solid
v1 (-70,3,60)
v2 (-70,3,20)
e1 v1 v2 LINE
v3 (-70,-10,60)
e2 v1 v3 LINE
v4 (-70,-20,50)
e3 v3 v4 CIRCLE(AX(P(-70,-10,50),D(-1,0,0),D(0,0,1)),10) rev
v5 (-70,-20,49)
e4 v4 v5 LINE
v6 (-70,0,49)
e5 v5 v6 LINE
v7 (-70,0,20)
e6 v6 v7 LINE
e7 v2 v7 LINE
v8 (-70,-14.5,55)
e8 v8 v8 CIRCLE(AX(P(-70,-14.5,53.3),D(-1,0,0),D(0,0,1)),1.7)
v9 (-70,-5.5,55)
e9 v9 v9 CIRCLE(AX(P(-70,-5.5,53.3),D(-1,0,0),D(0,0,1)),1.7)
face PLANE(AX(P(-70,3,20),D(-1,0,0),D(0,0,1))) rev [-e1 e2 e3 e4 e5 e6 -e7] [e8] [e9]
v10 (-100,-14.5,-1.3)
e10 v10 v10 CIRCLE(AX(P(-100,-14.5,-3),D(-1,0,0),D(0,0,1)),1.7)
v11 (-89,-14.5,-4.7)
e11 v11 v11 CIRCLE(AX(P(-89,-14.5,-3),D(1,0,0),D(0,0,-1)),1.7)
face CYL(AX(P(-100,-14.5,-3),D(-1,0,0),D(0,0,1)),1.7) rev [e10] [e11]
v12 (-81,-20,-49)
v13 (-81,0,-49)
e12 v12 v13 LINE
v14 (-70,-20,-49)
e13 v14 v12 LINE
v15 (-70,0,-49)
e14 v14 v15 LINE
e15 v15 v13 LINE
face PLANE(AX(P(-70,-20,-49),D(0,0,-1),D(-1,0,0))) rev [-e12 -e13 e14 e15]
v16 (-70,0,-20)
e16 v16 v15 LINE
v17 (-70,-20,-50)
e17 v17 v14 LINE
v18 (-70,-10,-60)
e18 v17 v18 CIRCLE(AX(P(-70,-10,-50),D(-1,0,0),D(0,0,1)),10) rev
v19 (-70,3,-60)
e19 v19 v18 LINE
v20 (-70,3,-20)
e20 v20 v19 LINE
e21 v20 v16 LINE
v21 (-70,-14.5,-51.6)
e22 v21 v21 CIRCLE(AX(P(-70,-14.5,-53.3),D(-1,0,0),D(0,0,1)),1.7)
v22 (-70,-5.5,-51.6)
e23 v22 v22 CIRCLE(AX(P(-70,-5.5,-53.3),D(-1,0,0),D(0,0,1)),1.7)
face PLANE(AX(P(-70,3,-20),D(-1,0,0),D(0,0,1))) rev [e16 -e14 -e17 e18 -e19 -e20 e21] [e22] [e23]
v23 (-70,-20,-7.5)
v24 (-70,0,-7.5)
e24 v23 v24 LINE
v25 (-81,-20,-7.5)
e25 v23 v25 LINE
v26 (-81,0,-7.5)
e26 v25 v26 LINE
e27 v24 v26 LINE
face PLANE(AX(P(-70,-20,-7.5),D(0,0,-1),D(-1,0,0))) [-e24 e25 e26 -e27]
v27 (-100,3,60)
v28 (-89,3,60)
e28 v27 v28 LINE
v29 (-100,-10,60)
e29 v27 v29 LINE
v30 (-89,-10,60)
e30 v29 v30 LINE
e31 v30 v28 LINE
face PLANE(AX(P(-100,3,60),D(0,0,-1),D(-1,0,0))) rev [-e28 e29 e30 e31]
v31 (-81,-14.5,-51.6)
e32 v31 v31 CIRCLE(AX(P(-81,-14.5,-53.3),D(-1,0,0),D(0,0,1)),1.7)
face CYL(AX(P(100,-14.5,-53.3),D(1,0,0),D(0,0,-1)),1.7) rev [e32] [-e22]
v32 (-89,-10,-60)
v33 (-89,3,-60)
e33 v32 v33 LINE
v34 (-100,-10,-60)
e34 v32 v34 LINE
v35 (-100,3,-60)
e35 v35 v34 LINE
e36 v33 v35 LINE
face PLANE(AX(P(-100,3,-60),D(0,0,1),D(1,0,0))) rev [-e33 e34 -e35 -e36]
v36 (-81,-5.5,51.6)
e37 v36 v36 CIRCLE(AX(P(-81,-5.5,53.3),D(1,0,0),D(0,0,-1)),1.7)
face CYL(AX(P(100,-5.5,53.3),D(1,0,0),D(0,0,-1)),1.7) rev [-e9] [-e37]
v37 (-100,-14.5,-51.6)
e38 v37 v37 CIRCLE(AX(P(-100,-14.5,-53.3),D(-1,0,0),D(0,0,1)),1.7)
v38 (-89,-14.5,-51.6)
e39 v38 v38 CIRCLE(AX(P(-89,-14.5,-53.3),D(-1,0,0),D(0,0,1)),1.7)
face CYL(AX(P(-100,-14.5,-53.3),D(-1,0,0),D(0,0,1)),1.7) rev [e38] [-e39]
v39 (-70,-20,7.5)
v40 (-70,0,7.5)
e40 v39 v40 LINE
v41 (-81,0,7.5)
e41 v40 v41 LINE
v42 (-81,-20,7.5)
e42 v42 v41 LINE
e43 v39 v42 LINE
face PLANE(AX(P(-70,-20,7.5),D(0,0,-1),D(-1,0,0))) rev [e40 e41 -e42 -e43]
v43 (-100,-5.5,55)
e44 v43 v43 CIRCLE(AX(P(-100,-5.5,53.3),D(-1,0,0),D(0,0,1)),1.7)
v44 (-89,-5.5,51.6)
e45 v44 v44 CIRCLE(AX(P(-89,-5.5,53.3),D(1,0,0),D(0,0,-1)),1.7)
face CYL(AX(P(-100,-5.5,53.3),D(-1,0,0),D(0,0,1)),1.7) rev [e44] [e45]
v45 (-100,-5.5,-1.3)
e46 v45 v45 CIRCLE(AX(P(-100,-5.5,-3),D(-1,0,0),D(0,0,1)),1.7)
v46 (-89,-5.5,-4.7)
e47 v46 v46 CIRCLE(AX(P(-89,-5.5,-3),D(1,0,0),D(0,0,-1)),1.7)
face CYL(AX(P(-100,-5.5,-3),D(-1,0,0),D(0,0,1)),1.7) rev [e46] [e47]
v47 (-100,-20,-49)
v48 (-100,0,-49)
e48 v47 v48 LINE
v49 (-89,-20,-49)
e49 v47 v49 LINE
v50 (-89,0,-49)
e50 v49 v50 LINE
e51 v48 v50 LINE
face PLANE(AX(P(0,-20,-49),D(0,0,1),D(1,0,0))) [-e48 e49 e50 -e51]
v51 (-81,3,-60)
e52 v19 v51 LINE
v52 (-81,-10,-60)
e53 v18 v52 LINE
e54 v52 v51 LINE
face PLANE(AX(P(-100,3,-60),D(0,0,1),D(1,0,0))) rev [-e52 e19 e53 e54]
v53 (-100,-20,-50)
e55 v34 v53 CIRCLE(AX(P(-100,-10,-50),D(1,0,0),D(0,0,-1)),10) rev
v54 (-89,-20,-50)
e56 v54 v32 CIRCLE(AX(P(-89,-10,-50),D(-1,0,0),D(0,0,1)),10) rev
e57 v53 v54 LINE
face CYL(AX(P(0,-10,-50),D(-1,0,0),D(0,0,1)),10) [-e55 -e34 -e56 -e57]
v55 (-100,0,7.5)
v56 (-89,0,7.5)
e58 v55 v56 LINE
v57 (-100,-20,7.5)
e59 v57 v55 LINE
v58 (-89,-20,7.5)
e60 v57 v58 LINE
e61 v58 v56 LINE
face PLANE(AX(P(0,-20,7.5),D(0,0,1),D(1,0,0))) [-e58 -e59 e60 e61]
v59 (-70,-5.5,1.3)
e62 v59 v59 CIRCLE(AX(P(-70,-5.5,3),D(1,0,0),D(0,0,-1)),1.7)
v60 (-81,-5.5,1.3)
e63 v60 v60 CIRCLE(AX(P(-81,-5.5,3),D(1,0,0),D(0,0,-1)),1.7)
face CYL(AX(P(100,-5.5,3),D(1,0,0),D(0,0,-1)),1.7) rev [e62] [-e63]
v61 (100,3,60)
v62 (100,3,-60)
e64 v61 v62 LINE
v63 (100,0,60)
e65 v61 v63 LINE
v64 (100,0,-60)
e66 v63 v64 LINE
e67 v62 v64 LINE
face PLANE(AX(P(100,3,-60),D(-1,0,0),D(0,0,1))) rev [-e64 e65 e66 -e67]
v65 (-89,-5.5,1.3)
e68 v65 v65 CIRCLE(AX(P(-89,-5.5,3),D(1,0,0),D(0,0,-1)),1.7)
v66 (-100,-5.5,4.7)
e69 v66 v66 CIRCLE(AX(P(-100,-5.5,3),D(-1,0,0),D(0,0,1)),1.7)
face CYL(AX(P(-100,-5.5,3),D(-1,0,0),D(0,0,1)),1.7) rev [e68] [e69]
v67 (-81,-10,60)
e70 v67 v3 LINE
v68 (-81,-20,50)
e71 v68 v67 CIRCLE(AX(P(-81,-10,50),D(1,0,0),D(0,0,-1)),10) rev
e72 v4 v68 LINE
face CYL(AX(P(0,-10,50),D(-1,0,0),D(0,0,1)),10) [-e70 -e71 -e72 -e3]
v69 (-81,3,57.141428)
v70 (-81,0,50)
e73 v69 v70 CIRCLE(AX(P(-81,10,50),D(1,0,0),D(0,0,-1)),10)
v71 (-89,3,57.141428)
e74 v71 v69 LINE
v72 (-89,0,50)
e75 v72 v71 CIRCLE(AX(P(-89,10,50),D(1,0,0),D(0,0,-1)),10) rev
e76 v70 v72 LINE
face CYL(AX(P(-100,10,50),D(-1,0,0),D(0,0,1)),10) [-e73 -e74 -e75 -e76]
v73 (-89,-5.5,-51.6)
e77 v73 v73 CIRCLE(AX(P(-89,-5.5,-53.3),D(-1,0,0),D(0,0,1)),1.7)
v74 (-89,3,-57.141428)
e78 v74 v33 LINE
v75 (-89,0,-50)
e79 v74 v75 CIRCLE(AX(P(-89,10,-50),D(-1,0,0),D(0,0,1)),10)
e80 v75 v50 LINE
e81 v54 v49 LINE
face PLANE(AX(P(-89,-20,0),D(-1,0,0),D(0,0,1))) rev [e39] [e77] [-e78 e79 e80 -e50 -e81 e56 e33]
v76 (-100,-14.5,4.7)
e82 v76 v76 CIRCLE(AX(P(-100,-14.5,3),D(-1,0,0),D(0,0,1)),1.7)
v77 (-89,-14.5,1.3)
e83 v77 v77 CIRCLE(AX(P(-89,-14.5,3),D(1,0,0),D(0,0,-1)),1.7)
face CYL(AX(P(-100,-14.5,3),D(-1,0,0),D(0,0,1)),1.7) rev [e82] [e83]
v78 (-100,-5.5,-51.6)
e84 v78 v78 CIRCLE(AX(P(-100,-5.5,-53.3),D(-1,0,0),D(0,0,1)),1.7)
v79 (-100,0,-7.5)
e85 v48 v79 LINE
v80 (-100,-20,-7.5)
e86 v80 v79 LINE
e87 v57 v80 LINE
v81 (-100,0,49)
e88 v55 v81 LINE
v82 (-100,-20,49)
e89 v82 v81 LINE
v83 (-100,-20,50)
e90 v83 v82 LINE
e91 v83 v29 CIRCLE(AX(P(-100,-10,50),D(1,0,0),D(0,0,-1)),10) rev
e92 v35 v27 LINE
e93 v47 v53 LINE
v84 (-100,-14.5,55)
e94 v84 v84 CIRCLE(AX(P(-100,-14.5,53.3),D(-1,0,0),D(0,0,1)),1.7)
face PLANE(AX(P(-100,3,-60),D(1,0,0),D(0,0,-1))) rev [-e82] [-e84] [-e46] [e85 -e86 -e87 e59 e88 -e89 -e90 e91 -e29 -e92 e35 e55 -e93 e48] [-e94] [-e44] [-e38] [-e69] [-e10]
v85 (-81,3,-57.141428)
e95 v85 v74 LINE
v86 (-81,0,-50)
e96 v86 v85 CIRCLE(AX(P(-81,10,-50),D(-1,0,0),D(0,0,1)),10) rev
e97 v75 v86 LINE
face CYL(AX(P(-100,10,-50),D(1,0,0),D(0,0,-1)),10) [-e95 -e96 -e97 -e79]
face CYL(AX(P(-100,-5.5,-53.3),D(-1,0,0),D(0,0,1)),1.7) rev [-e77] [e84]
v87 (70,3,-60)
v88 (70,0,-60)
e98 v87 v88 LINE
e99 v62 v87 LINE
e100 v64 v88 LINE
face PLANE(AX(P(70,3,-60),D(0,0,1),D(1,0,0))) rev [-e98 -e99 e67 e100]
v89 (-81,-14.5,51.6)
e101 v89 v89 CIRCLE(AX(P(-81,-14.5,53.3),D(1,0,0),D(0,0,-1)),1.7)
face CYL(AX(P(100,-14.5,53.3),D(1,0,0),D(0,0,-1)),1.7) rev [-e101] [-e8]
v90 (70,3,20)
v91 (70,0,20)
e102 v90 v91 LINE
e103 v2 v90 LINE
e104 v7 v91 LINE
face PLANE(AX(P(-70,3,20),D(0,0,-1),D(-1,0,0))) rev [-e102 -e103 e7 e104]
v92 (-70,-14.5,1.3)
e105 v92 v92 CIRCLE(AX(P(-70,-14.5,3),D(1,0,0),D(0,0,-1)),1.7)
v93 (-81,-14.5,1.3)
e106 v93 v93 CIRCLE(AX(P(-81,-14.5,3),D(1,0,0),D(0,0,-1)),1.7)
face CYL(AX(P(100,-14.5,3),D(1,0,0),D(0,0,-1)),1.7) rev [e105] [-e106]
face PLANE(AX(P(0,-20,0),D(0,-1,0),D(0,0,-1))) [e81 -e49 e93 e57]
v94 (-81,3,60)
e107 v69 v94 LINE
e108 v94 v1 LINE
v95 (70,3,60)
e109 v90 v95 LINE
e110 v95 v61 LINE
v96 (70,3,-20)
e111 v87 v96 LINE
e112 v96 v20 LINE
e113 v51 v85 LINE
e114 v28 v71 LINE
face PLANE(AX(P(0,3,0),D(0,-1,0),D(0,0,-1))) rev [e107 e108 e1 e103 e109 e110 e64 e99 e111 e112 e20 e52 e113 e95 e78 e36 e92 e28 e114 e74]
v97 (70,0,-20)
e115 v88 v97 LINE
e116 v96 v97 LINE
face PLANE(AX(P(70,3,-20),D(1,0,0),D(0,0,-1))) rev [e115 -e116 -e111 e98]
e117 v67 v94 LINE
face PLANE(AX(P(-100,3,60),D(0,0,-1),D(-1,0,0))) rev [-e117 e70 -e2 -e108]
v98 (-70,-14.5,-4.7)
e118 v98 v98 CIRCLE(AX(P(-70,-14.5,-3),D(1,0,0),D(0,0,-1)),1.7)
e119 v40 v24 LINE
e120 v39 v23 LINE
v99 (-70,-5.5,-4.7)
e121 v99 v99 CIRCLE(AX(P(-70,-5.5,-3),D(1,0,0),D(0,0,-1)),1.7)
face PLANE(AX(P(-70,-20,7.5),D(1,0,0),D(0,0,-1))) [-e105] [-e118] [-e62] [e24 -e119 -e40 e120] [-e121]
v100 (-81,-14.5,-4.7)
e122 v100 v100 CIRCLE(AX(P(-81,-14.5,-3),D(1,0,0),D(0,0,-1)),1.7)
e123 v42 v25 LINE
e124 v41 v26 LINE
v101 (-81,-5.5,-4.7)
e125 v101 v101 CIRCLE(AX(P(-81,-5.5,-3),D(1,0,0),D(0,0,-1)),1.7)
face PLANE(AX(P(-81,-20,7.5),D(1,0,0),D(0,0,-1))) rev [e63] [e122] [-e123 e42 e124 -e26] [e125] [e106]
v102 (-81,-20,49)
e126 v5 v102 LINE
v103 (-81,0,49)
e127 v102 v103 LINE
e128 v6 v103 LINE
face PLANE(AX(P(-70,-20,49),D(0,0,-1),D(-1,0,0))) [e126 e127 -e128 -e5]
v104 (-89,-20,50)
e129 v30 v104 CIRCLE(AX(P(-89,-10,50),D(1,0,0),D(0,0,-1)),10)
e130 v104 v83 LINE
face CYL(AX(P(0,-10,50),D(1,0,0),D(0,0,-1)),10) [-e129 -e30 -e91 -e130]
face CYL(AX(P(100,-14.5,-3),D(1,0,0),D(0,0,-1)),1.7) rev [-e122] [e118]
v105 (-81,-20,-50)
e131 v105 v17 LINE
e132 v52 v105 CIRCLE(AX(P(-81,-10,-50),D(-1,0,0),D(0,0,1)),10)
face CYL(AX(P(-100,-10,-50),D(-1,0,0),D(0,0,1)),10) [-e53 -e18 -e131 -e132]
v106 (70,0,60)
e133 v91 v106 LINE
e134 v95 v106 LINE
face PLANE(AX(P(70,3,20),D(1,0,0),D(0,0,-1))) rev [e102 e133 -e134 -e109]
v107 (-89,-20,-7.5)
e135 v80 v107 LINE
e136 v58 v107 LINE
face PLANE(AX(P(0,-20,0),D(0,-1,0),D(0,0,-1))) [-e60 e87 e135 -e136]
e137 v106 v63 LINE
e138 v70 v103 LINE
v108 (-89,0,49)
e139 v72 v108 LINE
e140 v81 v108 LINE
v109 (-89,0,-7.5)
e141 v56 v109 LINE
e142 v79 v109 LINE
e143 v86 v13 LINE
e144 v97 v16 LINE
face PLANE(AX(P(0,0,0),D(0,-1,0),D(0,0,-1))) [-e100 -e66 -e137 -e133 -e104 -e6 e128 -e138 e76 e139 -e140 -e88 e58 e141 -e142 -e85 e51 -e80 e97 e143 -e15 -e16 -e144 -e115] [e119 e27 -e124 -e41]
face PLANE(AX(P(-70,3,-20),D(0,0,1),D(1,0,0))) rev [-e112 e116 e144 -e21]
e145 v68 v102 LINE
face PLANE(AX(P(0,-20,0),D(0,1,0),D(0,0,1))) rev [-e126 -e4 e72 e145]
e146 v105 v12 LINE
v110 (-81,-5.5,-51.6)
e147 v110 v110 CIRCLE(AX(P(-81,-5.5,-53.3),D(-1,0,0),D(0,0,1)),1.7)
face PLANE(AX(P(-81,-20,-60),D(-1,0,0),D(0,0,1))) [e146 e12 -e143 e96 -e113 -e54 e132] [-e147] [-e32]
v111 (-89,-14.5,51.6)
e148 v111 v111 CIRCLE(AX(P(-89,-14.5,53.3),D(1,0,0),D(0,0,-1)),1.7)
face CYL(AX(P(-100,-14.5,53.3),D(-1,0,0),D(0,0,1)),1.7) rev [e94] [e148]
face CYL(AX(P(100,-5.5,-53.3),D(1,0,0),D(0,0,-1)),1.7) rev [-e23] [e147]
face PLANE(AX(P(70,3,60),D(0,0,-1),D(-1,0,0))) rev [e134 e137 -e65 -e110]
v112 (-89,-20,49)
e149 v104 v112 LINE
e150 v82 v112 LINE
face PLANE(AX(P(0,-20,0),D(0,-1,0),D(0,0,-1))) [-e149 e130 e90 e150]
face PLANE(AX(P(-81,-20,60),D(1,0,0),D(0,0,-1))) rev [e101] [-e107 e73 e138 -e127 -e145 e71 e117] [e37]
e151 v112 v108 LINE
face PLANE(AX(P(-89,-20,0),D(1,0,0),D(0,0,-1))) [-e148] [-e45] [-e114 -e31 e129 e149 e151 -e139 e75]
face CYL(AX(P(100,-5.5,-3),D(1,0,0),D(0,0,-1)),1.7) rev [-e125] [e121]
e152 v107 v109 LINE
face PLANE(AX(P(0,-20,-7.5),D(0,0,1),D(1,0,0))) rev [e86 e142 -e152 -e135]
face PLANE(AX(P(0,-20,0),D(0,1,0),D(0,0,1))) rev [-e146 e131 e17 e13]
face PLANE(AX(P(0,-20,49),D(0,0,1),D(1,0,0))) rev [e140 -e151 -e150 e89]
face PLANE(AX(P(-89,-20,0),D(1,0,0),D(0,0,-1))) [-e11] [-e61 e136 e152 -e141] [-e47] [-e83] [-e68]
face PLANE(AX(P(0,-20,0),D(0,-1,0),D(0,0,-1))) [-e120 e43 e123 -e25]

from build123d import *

# Parameters (mm, degrees)
EXTRUDE_1_DEPTH         = 3
SKETCH_3_W              = 11
SKETCH_3_H              = 7.5
SKETCH_3_H_2            = 11
SKETCH_3_H_3            = 15
EXTRUDE_3_DEPTH         = 20
HOLE_WIZARD_M3_1_REACH  = 211.762
HOLE_WIZARD_M3_1_BORE_R = 1.7
FILLET_1_R              = 10


with BuildPart() as part:
    # 스케치1 → 보스-돌출1 (new body)
    with BuildSketch(Plane(origin=(0, 0, 0), x_dir=(1, 0, 0), z_dir=(0, 1, 0))):
        Polygon((-100, 60), (-70, 60), (-70, 20), (70, 20), (70, 60), (100, 60), (100, -60), (70, -60), (70, -20), (-70, -20), (-70, -60), (-100, -60), align=None)
    extrude(amount=EXTRUDE_1_DEPTH)

    # 스케치3 → 보스-돌출3 (add)
    with BuildSketch(Plane.XZ):
        with Locations((-94.5, -3.75)):
            Rectangle(SKETCH_3_W, SKETCH_3_H)
        with Locations((-94.5, 3.75)):
            Rectangle(SKETCH_3_W, SKETCH_3_H)
        with Locations((-94.5, 54.5)):
            Rectangle(SKETCH_3_W, SKETCH_3_H_2)
        with Locations((-94.5, -54.5)):
            Rectangle(SKETCH_3_W, SKETCH_3_H_2)
        with Locations((-75.5, 54.5)):
            Rectangle(SKETCH_3_W, SKETCH_3_H_2)
        with Locations((-75.5, -54.5)):
            Rectangle(SKETCH_3_W, SKETCH_3_H_2)
        with Locations((-75.5, 0)):
            Rectangle(SKETCH_3_W, SKETCH_3_H_3)
    extrude(amount=EXTRUDE_3_DEPTH)

    # M3 여유 구멍1 bore → M3 여유 구멍1 (cut, up to next)
    with BuildSketch(Plane.ZY.offset(100), mode=Mode.PRIVATE) as hole_wizard_m3_1_sk1:
        with Locations((-3, -5.5)):
            Circle(HOLE_WIZARD_M3_1_BORE_R)
    hole_wizard_m3_1_tool1 = extrude(hole_wizard_m3_1_sk1.sketch, amount=-HOLE_WIZARD_M3_1_REACH, mode=Mode.PRIVATE) & part.part
    # M3 여유 구멍1 bore → M3 여유 구멍1 (cut, up to next)
    with BuildSketch(Plane.ZY.offset(100), mode=Mode.PRIVATE) as hole_wizard_m3_1_sk2:
        with Locations((-3, -14.5)):
            Circle(HOLE_WIZARD_M3_1_BORE_R)
    hole_wizard_m3_1_tool2 = extrude(hole_wizard_m3_1_sk2.sketch, amount=-HOLE_WIZARD_M3_1_REACH, mode=Mode.PRIVATE) & part.part
    # M3 여유 구멍1 bore → M3 여유 구멍1 (cut, up to next)
    with BuildSketch(Plane.ZY.offset(100), mode=Mode.PRIVATE) as hole_wizard_m3_1_sk3:
        with Locations((-53.3, -5.5)):
            Circle(HOLE_WIZARD_M3_1_BORE_R)
    hole_wizard_m3_1_tool3 = extrude(hole_wizard_m3_1_sk3.sketch, amount=-HOLE_WIZARD_M3_1_REACH, mode=Mode.PRIVATE) & part.part
    # M3 여유 구멍1 bore → M3 여유 구멍1 (cut, up to next)
    with BuildSketch(Plane.ZY.offset(100), mode=Mode.PRIVATE) as hole_wizard_m3_1_sk4:
        with Locations((-53.3, -14.5)):
            Circle(HOLE_WIZARD_M3_1_BORE_R)
    hole_wizard_m3_1_tool4 = extrude(hole_wizard_m3_1_sk4.sketch, amount=-HOLE_WIZARD_M3_1_REACH, mode=Mode.PRIVATE) & part.part
    # M3 여유 구멍1 bore → M3 여유 구멍1 (cut, up to next)
    with BuildSketch(Plane.ZY.offset(100), mode=Mode.PRIVATE) as hole_wizard_m3_1_sk5:
        with Locations((53.3, -5.5)):
            Circle(HOLE_WIZARD_M3_1_BORE_R)
    hole_wizard_m3_1_tool5 = extrude(hole_wizard_m3_1_sk5.sketch, amount=-HOLE_WIZARD_M3_1_REACH, mode=Mode.PRIVATE) & part.part
    # M3 여유 구멍1 bore → M3 여유 구멍1 (cut, up to next)
    with BuildSketch(Plane.ZY.offset(100), mode=Mode.PRIVATE) as hole_wizard_m3_1_sk6:
        with Locations((53.3, -14.5)):
            Circle(HOLE_WIZARD_M3_1_BORE_R)
    hole_wizard_m3_1_tool6 = extrude(hole_wizard_m3_1_sk6.sketch, amount=-HOLE_WIZARD_M3_1_REACH, mode=Mode.PRIVATE) & part.part
    # M3 여유 구멍1 bore → M3 여유 구멍1 (cut, up to next)
    with BuildSketch(Plane.ZY.offset(100), mode=Mode.PRIVATE) as hole_wizard_m3_1_sk7:
        with Locations((3, -14.5)):
            Circle(HOLE_WIZARD_M3_1_BORE_R)
    hole_wizard_m3_1_tool7 = extrude(hole_wizard_m3_1_sk7.sketch, amount=-HOLE_WIZARD_M3_1_REACH, mode=Mode.PRIVATE) & part.part
    # M3 여유 구멍1 bore → M3 여유 구멍1 (cut, up to next)
    with BuildSketch(Plane.ZY.offset(100), mode=Mode.PRIVATE) as hole_wizard_m3_1_sk8:
        with Locations((3, -5.5)):
            Circle(HOLE_WIZARD_M3_1_BORE_R)
    hole_wizard_m3_1_tool8 = extrude(hole_wizard_m3_1_sk8.sketch, amount=-HOLE_WIZARD_M3_1_REACH, mode=Mode.PRIVATE) & part.part
    hole_wizard_m3_1_1 = hole_wizard_m3_1_tool1.solids().sort_by_distance((-100, -5.5, -3))[0]
    add(hole_wizard_m3_1_1, mode=Mode.SUBTRACT)
    hole_wizard_m3_1_2 = hole_wizard_m3_1_tool2.solids().sort_by_distance((-100, -14.5, -3))[0]
    add(hole_wizard_m3_1_2, mode=Mode.SUBTRACT)
    hole_wizard_m3_1_3 = hole_wizard_m3_1_tool3.solids().sort_by_distance((-100, -5.5, -53.3))[0]
    add(hole_wizard_m3_1_3, mode=Mode.SUBTRACT)
    hole_wizard_m3_1_4 = hole_wizard_m3_1_tool4.solids().sort_by_distance((-100, -14.5, -53.3))[0]
    add(hole_wizard_m3_1_4, mode=Mode.SUBTRACT)
    hole_wizard_m3_1_5 = hole_wizard_m3_1_tool5.solids().sort_by_distance((-100, -5.5, 53.3))[0]
    add(hole_wizard_m3_1_5, mode=Mode.SUBTRACT)
    hole_wizard_m3_1_6 = hole_wizard_m3_1_tool6.solids().sort_by_distance((-100, -14.5, 53.3))[0]
    add(hole_wizard_m3_1_6, mode=Mode.SUBTRACT)
    hole_wizard_m3_1_7 = hole_wizard_m3_1_tool7.solids().sort_by_distance((-100, -14.5, 3))[0]
    add(hole_wizard_m3_1_7, mode=Mode.SUBTRACT)
    hole_wizard_m3_1_8 = hole_wizard_m3_1_tool8.solids().sort_by_distance((-100, -5.5, 3))[0]
    add(hole_wizard_m3_1_8, mode=Mode.SUBTRACT)
    hole_wizard_m3_1 = hole_wizard_m3_1_1 + hole_wizard_m3_1_2 + hole_wizard_m3_1_3 + hole_wizard_m3_1_4 + hole_wizard_m3_1_5 + hole_wizard_m3_1_6 + hole_wizard_m3_1_7 + hole_wizard_m3_1_8  # M3 여유 구멍1 as one shape, for the pattern or mirror that repeats it

    # 대칭 복사1: M3 여유 구멍1 mirrored; each copy of M3 여유 구멍1 runs up to whatever stops it at its own place
    mirror_1_before = part.part  # the part as the pattern finds it: every copy runs up to it
    mirror_1_hole_wizard_m3_1_long1 = extrude(hole_wizard_m3_1_sk1.sketch, amount=-HOLE_WIZARD_M3_1_REACH, mode=Mode.PRIVATE)
    mirror_1_hole_wizard_m3_1_long2 = extrude(hole_wizard_m3_1_sk2.sketch, amount=-HOLE_WIZARD_M3_1_REACH, mode=Mode.PRIVATE)
    mirror_1_hole_wizard_m3_1_long3 = extrude(hole_wizard_m3_1_sk3.sketch, amount=-HOLE_WIZARD_M3_1_REACH, mode=Mode.PRIVATE)
    mirror_1_hole_wizard_m3_1_long4 = extrude(hole_wizard_m3_1_sk4.sketch, amount=-HOLE_WIZARD_M3_1_REACH, mode=Mode.PRIVATE)
    mirror_1_hole_wizard_m3_1_long5 = extrude(hole_wizard_m3_1_sk5.sketch, amount=-HOLE_WIZARD_M3_1_REACH, mode=Mode.PRIVATE)
    mirror_1_hole_wizard_m3_1_long6 = extrude(hole_wizard_m3_1_sk6.sketch, amount=-HOLE_WIZARD_M3_1_REACH, mode=Mode.PRIVATE)
    mirror_1_hole_wizard_m3_1_long7 = extrude(hole_wizard_m3_1_sk7.sketch, amount=-HOLE_WIZARD_M3_1_REACH, mode=Mode.PRIVATE)
    mirror_1_hole_wizard_m3_1_long8 = extrude(hole_wizard_m3_1_sk8.sketch, amount=-HOLE_WIZARD_M3_1_REACH, mode=Mode.PRIVATE)
    mirror_1_hole_wizard_m3_1_tool1_1 = mirror_1_hole_wizard_m3_1_long1.mirror(Plane(origin=(0, 0, 0), x_dir=(0, 0, 1), z_dir=(1, 0, 0))) & mirror_1_before
    add(mirror_1_hole_wizard_m3_1_tool1_1.solids().sort_by_distance((100, -5.5, -3))[0], mode=Mode.SUBTRACT)
    mirror_1_hole_wizard_m3_1_tool2_1 = mirror_1_hole_wizard_m3_1_long2.mirror(Plane(origin=(0, 0, 0), x_dir=(0, 0, 1), z_dir=(1, 0, 0))) & mirror_1_before
    add(mirror_1_hole_wizard_m3_1_tool2_1.solids().sort_by_distance((100, -14.5, -3))[0], mode=Mode.SUBTRACT)
    mirror_1_hole_wizard_m3_1_tool3_1 = mirror_1_hole_wizard_m3_1_long3.mirror(Plane(origin=(0, 0, 0), x_dir=(0, 0, 1), z_dir=(1, 0, 0))) & mirror_1_before
    add(mirror_1_hole_wizard_m3_1_tool3_1.solids().sort_by_distance((100, -5.5, -53.3))[0], mode=Mode.SUBTRACT)
    mirror_1_hole_wizard_m3_1_tool4_1 = mirror_1_hole_wizard_m3_1_long4.mirror(Plane(origin=(0, 0, 0), x_dir=(0, 0, 1), z_dir=(1, 0, 0))) & mirror_1_before
    add(mirror_1_hole_wizard_m3_1_tool4_1.solids().sort_by_distance((100, -14.5, -53.3))[0], mode=Mode.SUBTRACT)
    mirror_1_hole_wizard_m3_1_tool5_1 = mirror_1_hole_wizard_m3_1_long5.mirror(Plane(origin=(0, 0, 0), x_dir=(0, 0, 1), z_dir=(1, 0, 0))) & mirror_1_before
    add(mirror_1_hole_wizard_m3_1_tool5_1.solids().sort_by_distance((100, -5.5, 53.3))[0], mode=Mode.SUBTRACT)
    mirror_1_hole_wizard_m3_1_tool6_1 = mirror_1_hole_wizard_m3_1_long6.mirror(Plane(origin=(0, 0, 0), x_dir=(0, 0, 1), z_dir=(1, 0, 0))) & mirror_1_before
    add(mirror_1_hole_wizard_m3_1_tool6_1.solids().sort_by_distance((100, -14.5, 53.3))[0], mode=Mode.SUBTRACT)
    mirror_1_hole_wizard_m3_1_tool7_1 = mirror_1_hole_wizard_m3_1_long7.mirror(Plane(origin=(0, 0, 0), x_dir=(0, 0, 1), z_dir=(1, 0, 0))) & mirror_1_before
    add(mirror_1_hole_wizard_m3_1_tool7_1.solids().sort_by_distance((100, -14.5, 3))[0], mode=Mode.SUBTRACT)
    mirror_1_hole_wizard_m3_1_tool8_1 = mirror_1_hole_wizard_m3_1_long8.mirror(Plane(origin=(0, 0, 0), x_dir=(0, 0, 1), z_dir=(1, 0, 0))) & mirror_1_before
    add(mirror_1_hole_wizard_m3_1_tool8_1.solids().sort_by_distance((100, -5.5, 3))[0], mode=Mode.SUBTRACT)

    # 필렛1
    # the kernel refuses this fillet: 10 mm, written as the material it takes off along each edge
    with BuildSketch(Plane(origin=(-81, 0, 60), x_dir=(0, 0, -1), z_dir=(-1, 0, 0))) as fillet_1_piece_1:
        with BuildLine():
            CenterArc((FILLET_1_R, -FILLET_1_R), FILLET_1_R, 90, 90)
            Line((0, -FILLET_1_R), (0, 0))
            Line((0, 0), (FILLET_1_R, 0))
        make_face()
    extrude(amount=8, mode=Mode.SUBTRACT)
    with BuildSketch(Plane(origin=(-64, -20, 60), x_dir=(0, 1, 0), z_dir=(-1, 0, 0)), Plane(origin=(-125, -20, -60), x_dir=(0, 1, 0), z_dir=(1, 0, 0)), Plane(origin=(-106, -20, -60), x_dir=(0, 1, 0), z_dir=(1, 0, 0))) as fillet_1_piece_2:
        with BuildLine():
            CenterArc((FILLET_1_R, FILLET_1_R), FILLET_1_R, 180, 90)
            Line((0, FILLET_1_R), (0, 0))
            Line((0, 0), (FILLET_1_R, 0))
        make_face()
    extrude(amount=61, mode=Mode.SUBTRACT)
    with BuildSketch(Plane(origin=(-106, -20, 60), x_dir=(0, 1, 0), z_dir=(1, 0, 0))) as fillet_1_piece_3:
        with BuildLine():
            CenterArc((FILLET_1_R, -FILLET_1_R), FILLET_1_R, 90, 90)
            Line((0, -FILLET_1_R), (0, 0))
            Line((0, 0), (FILLET_1_R, 0))
        make_face()
    extrude(amount=61, mode=Mode.SUBTRACT)
    with BuildSketch(Plane(origin=(-89, 0, -60), x_dir=(0, 1, 0), z_dir=(1, 0, 0))) as fillet_1_piece_4:
        with BuildLine():
            CenterArc((FILLET_1_R, FILLET_1_R), FILLET_1_R, 180, 90)
            Line((0, FILLET_1_R), (0, 0))
            Line((0, 0), (FILLET_1_R, 0))
        make_face()
    extrude(amount=8, mode=Mode.SUBTRACT)


solid = part.part
